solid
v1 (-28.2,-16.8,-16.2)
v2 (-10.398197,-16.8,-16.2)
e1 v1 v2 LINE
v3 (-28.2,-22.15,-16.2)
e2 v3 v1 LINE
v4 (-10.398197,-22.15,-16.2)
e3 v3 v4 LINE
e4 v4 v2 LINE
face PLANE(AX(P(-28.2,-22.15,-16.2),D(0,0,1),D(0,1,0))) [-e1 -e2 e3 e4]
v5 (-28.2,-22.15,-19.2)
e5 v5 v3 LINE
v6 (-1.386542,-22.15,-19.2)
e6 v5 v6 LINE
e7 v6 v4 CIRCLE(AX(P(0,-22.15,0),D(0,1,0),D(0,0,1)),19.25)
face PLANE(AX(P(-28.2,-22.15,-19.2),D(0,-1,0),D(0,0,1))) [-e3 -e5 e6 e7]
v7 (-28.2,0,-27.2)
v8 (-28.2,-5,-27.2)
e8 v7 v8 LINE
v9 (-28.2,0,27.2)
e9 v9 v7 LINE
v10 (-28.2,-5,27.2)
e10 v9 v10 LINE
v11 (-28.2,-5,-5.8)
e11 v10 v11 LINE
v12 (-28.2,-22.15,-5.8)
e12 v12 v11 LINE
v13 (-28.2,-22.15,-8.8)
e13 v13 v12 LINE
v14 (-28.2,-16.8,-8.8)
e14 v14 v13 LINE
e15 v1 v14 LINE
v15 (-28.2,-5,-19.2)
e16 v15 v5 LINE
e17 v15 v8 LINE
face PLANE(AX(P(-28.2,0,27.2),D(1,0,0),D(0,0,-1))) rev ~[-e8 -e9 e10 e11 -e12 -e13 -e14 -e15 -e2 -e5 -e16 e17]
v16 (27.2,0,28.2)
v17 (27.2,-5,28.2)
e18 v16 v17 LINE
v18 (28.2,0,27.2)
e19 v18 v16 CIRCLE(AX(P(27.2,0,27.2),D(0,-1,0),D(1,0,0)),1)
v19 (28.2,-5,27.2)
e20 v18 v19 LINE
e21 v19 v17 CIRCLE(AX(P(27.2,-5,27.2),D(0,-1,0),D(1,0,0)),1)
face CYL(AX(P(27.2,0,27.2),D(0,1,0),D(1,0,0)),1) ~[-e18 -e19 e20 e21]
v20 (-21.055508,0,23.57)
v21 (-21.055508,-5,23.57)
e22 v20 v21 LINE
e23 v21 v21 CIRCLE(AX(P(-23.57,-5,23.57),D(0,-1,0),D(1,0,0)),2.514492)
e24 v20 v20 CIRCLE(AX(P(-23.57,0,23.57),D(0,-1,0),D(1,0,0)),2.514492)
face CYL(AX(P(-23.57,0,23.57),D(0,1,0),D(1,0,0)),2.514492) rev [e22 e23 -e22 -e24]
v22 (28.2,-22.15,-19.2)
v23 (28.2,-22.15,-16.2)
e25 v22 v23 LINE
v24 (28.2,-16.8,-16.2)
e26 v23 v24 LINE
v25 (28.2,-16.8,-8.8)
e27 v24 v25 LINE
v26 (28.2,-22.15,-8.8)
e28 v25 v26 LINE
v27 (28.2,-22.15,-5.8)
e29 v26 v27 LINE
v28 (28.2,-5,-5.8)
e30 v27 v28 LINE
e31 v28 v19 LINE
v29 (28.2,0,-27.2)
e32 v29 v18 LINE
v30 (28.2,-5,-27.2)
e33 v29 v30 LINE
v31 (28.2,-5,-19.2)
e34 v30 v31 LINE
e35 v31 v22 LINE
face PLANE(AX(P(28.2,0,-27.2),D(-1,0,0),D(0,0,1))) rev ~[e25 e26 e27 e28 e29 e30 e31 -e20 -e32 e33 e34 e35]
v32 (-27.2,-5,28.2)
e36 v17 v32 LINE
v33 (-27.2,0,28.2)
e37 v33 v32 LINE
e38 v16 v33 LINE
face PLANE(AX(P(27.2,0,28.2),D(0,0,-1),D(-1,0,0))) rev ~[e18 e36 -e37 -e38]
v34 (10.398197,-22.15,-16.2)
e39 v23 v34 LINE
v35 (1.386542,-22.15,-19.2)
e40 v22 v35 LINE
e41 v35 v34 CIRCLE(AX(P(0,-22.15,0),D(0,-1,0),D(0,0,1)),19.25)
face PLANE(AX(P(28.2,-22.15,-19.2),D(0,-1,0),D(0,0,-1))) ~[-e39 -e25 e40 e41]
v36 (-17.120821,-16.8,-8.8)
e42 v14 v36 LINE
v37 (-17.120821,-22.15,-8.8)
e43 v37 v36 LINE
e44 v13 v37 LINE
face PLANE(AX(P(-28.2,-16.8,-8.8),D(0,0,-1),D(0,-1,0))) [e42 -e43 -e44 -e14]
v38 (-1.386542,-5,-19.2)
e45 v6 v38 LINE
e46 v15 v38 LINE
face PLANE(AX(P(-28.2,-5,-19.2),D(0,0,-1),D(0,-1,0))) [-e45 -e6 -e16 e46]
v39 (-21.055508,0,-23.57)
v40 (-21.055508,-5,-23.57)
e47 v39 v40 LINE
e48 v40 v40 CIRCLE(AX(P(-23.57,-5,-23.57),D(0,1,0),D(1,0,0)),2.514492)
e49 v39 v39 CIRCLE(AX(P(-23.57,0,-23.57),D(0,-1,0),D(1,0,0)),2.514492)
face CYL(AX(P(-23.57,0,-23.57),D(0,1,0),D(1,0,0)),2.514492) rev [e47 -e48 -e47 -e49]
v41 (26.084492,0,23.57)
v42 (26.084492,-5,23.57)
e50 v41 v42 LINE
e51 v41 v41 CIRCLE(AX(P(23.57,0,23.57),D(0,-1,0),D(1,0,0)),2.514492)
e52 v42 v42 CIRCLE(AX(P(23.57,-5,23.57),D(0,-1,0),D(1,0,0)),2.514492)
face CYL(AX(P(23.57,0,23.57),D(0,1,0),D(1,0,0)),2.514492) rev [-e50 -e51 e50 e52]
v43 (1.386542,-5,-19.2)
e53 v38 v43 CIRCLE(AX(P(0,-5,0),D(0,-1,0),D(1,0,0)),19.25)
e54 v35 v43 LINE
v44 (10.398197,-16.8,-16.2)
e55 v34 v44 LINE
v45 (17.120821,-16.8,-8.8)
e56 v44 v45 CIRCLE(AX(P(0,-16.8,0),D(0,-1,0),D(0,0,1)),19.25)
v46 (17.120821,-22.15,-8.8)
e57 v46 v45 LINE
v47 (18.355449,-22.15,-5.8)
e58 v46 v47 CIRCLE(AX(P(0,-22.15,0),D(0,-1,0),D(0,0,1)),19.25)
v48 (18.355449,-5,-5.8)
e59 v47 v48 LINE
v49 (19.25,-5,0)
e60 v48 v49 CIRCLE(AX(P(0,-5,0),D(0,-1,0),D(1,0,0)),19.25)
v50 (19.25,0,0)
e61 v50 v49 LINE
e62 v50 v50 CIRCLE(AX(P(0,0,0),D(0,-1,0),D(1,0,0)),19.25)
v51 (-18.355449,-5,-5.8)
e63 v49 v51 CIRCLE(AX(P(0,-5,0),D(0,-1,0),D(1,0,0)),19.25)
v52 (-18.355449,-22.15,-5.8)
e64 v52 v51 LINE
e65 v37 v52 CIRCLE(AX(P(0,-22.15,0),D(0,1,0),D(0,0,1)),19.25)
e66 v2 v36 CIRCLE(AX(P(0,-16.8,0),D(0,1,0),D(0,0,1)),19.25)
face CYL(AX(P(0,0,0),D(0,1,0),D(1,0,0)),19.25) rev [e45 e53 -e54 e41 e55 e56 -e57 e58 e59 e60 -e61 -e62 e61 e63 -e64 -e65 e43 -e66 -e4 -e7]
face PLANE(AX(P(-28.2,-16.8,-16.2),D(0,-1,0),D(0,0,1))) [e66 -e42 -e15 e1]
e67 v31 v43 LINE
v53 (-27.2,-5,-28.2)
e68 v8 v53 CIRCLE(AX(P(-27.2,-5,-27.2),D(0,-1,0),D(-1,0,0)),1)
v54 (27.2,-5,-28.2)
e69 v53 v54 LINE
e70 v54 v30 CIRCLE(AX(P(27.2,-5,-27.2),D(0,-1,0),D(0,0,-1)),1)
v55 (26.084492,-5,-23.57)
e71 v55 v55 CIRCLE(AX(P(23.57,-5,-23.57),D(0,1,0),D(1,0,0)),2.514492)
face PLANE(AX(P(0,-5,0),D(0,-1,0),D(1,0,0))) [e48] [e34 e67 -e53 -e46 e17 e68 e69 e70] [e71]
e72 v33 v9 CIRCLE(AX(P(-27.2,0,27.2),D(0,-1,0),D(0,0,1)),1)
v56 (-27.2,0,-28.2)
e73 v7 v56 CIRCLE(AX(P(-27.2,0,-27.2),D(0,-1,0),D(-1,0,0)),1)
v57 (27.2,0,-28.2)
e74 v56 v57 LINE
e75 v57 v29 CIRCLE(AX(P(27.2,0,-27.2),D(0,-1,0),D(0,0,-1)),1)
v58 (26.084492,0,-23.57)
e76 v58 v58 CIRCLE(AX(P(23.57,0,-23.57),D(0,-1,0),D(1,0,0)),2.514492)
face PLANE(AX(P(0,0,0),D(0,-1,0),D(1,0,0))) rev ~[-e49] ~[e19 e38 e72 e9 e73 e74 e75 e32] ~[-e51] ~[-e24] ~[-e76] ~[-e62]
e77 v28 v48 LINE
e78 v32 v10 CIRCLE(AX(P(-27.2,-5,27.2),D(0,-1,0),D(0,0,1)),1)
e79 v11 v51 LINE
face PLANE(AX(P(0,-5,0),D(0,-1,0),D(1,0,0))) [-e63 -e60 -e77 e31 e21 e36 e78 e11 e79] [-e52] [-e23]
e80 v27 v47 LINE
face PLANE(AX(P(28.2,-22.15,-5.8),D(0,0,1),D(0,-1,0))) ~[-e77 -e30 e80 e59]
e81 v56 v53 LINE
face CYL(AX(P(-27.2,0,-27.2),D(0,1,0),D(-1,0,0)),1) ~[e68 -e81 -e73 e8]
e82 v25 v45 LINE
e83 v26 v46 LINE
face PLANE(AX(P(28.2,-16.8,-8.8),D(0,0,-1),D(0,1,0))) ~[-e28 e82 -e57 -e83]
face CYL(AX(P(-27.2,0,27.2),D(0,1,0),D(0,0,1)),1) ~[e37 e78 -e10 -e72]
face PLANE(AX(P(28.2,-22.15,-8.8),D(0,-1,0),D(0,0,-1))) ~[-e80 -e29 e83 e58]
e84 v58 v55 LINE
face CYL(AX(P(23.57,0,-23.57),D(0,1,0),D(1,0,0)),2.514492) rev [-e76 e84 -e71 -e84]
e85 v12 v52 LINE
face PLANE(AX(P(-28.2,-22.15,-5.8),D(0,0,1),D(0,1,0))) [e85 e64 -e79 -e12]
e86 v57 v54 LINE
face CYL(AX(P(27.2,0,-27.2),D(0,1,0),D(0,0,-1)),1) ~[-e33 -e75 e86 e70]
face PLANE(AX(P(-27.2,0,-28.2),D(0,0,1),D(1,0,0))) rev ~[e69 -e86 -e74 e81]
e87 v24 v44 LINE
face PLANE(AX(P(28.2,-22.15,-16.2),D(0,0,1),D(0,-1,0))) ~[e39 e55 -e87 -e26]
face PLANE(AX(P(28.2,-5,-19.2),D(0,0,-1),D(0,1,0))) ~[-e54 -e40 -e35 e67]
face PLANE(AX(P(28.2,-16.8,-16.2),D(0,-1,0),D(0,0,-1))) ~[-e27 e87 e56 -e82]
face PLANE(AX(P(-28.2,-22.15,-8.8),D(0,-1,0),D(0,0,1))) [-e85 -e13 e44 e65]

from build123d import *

# Parameters (mm, degrees)
F0_R          = 2.5144921482
F0_R_2        = 19.25
F1_DEPTH      = 5
F4_END_RADIUS = 19.25
F4_REACH      = 78.1652482066


with BuildPart() as f1:
    # F0 (on Front) → F1 (new body)
    with BuildSketch(Plane.XZ):
        with BuildLine():
            Line((-27.2, -28.2), (27.2, -28.2))
            ThreePointArc((27.2, -28.2), (27.9071067812, -27.9071067812), (28.2, -27.2))
            Line((28.2, -27.2), (28.2, 27.2))
            ThreePointArc((28.2, 27.2), (27.9071067812, 27.9071067812), (27.2, 28.2))
            Line((27.2, 28.2), (-27.2, 28.2))
            ThreePointArc((-27.2, 28.2), (-27.9071067812, 27.9071067812), (-28.2, 27.2))
            Line((-28.2, 27.2), (-28.2, -27.2))
            ThreePointArc((-28.2, -27.2), (-27.9071067812, -27.9071067812), (-27.2, -28.2))
        make_face()
        with Locations((-23.57, -23.57)):
            Circle(F0_R, mode=Mode.SUBTRACT)
        with Locations((23.57, -23.57)):
            Circle(F0_R, mode=Mode.SUBTRACT)
        with Locations((-23.57, 23.57)):
            Circle(F0_R, mode=Mode.SUBTRACT)
        Circle(F0_R_2, mode=Mode.SUBTRACT)
        with Locations((23.57, 23.57)):
            Circle(F0_R, mode=Mode.SUBTRACT)
    extrude(amount=F1_DEPTH)

    f4_end = (Plane.ZX.offset(-2.5) * Cylinder(F4_END_RADIUS, 316.1669127895, mode=Mode.PRIVATE)).faces().sort_by_distance((-19.25, -2.5, 0))[0]
    # F3 (on face) → F4 (join, up to the whole of a round face its end follows)
    with BuildSketch(Plane(origin=(-28.2, 0, 0), x_dir=(0, -1, 0), z_dir=(-1, 0, 0))):
        Polygon((4.9999998882, -16.2), (4.9999998882, -19.2), (22.1499998882, -19.2), (22.1499998882, -16.2), (21.9999998882, -16.2), (16.7999998882, -16.2), (16.7999998882, -8.8), (22.1499998882, -8.8), (22.1499998882, -5.8), (4.9999998882, -5.8), align=None)
    f4_long = extrude(amount=-F4_REACH, mode=Mode.PRIVATE)
    add(split(f4_long, bisect_by=f4_end, keep=Keep.ALL, mode=Mode.PRIVATE).solids().sort_by_distance((-28.2, -12.347048043, -12.5))[0])

    # F5: F1 across plane


with BuildPart() as f1_1:
    add(f1.part)
    add(f1.part.mirror(Plane.YZ))


solid = f1_1.part
